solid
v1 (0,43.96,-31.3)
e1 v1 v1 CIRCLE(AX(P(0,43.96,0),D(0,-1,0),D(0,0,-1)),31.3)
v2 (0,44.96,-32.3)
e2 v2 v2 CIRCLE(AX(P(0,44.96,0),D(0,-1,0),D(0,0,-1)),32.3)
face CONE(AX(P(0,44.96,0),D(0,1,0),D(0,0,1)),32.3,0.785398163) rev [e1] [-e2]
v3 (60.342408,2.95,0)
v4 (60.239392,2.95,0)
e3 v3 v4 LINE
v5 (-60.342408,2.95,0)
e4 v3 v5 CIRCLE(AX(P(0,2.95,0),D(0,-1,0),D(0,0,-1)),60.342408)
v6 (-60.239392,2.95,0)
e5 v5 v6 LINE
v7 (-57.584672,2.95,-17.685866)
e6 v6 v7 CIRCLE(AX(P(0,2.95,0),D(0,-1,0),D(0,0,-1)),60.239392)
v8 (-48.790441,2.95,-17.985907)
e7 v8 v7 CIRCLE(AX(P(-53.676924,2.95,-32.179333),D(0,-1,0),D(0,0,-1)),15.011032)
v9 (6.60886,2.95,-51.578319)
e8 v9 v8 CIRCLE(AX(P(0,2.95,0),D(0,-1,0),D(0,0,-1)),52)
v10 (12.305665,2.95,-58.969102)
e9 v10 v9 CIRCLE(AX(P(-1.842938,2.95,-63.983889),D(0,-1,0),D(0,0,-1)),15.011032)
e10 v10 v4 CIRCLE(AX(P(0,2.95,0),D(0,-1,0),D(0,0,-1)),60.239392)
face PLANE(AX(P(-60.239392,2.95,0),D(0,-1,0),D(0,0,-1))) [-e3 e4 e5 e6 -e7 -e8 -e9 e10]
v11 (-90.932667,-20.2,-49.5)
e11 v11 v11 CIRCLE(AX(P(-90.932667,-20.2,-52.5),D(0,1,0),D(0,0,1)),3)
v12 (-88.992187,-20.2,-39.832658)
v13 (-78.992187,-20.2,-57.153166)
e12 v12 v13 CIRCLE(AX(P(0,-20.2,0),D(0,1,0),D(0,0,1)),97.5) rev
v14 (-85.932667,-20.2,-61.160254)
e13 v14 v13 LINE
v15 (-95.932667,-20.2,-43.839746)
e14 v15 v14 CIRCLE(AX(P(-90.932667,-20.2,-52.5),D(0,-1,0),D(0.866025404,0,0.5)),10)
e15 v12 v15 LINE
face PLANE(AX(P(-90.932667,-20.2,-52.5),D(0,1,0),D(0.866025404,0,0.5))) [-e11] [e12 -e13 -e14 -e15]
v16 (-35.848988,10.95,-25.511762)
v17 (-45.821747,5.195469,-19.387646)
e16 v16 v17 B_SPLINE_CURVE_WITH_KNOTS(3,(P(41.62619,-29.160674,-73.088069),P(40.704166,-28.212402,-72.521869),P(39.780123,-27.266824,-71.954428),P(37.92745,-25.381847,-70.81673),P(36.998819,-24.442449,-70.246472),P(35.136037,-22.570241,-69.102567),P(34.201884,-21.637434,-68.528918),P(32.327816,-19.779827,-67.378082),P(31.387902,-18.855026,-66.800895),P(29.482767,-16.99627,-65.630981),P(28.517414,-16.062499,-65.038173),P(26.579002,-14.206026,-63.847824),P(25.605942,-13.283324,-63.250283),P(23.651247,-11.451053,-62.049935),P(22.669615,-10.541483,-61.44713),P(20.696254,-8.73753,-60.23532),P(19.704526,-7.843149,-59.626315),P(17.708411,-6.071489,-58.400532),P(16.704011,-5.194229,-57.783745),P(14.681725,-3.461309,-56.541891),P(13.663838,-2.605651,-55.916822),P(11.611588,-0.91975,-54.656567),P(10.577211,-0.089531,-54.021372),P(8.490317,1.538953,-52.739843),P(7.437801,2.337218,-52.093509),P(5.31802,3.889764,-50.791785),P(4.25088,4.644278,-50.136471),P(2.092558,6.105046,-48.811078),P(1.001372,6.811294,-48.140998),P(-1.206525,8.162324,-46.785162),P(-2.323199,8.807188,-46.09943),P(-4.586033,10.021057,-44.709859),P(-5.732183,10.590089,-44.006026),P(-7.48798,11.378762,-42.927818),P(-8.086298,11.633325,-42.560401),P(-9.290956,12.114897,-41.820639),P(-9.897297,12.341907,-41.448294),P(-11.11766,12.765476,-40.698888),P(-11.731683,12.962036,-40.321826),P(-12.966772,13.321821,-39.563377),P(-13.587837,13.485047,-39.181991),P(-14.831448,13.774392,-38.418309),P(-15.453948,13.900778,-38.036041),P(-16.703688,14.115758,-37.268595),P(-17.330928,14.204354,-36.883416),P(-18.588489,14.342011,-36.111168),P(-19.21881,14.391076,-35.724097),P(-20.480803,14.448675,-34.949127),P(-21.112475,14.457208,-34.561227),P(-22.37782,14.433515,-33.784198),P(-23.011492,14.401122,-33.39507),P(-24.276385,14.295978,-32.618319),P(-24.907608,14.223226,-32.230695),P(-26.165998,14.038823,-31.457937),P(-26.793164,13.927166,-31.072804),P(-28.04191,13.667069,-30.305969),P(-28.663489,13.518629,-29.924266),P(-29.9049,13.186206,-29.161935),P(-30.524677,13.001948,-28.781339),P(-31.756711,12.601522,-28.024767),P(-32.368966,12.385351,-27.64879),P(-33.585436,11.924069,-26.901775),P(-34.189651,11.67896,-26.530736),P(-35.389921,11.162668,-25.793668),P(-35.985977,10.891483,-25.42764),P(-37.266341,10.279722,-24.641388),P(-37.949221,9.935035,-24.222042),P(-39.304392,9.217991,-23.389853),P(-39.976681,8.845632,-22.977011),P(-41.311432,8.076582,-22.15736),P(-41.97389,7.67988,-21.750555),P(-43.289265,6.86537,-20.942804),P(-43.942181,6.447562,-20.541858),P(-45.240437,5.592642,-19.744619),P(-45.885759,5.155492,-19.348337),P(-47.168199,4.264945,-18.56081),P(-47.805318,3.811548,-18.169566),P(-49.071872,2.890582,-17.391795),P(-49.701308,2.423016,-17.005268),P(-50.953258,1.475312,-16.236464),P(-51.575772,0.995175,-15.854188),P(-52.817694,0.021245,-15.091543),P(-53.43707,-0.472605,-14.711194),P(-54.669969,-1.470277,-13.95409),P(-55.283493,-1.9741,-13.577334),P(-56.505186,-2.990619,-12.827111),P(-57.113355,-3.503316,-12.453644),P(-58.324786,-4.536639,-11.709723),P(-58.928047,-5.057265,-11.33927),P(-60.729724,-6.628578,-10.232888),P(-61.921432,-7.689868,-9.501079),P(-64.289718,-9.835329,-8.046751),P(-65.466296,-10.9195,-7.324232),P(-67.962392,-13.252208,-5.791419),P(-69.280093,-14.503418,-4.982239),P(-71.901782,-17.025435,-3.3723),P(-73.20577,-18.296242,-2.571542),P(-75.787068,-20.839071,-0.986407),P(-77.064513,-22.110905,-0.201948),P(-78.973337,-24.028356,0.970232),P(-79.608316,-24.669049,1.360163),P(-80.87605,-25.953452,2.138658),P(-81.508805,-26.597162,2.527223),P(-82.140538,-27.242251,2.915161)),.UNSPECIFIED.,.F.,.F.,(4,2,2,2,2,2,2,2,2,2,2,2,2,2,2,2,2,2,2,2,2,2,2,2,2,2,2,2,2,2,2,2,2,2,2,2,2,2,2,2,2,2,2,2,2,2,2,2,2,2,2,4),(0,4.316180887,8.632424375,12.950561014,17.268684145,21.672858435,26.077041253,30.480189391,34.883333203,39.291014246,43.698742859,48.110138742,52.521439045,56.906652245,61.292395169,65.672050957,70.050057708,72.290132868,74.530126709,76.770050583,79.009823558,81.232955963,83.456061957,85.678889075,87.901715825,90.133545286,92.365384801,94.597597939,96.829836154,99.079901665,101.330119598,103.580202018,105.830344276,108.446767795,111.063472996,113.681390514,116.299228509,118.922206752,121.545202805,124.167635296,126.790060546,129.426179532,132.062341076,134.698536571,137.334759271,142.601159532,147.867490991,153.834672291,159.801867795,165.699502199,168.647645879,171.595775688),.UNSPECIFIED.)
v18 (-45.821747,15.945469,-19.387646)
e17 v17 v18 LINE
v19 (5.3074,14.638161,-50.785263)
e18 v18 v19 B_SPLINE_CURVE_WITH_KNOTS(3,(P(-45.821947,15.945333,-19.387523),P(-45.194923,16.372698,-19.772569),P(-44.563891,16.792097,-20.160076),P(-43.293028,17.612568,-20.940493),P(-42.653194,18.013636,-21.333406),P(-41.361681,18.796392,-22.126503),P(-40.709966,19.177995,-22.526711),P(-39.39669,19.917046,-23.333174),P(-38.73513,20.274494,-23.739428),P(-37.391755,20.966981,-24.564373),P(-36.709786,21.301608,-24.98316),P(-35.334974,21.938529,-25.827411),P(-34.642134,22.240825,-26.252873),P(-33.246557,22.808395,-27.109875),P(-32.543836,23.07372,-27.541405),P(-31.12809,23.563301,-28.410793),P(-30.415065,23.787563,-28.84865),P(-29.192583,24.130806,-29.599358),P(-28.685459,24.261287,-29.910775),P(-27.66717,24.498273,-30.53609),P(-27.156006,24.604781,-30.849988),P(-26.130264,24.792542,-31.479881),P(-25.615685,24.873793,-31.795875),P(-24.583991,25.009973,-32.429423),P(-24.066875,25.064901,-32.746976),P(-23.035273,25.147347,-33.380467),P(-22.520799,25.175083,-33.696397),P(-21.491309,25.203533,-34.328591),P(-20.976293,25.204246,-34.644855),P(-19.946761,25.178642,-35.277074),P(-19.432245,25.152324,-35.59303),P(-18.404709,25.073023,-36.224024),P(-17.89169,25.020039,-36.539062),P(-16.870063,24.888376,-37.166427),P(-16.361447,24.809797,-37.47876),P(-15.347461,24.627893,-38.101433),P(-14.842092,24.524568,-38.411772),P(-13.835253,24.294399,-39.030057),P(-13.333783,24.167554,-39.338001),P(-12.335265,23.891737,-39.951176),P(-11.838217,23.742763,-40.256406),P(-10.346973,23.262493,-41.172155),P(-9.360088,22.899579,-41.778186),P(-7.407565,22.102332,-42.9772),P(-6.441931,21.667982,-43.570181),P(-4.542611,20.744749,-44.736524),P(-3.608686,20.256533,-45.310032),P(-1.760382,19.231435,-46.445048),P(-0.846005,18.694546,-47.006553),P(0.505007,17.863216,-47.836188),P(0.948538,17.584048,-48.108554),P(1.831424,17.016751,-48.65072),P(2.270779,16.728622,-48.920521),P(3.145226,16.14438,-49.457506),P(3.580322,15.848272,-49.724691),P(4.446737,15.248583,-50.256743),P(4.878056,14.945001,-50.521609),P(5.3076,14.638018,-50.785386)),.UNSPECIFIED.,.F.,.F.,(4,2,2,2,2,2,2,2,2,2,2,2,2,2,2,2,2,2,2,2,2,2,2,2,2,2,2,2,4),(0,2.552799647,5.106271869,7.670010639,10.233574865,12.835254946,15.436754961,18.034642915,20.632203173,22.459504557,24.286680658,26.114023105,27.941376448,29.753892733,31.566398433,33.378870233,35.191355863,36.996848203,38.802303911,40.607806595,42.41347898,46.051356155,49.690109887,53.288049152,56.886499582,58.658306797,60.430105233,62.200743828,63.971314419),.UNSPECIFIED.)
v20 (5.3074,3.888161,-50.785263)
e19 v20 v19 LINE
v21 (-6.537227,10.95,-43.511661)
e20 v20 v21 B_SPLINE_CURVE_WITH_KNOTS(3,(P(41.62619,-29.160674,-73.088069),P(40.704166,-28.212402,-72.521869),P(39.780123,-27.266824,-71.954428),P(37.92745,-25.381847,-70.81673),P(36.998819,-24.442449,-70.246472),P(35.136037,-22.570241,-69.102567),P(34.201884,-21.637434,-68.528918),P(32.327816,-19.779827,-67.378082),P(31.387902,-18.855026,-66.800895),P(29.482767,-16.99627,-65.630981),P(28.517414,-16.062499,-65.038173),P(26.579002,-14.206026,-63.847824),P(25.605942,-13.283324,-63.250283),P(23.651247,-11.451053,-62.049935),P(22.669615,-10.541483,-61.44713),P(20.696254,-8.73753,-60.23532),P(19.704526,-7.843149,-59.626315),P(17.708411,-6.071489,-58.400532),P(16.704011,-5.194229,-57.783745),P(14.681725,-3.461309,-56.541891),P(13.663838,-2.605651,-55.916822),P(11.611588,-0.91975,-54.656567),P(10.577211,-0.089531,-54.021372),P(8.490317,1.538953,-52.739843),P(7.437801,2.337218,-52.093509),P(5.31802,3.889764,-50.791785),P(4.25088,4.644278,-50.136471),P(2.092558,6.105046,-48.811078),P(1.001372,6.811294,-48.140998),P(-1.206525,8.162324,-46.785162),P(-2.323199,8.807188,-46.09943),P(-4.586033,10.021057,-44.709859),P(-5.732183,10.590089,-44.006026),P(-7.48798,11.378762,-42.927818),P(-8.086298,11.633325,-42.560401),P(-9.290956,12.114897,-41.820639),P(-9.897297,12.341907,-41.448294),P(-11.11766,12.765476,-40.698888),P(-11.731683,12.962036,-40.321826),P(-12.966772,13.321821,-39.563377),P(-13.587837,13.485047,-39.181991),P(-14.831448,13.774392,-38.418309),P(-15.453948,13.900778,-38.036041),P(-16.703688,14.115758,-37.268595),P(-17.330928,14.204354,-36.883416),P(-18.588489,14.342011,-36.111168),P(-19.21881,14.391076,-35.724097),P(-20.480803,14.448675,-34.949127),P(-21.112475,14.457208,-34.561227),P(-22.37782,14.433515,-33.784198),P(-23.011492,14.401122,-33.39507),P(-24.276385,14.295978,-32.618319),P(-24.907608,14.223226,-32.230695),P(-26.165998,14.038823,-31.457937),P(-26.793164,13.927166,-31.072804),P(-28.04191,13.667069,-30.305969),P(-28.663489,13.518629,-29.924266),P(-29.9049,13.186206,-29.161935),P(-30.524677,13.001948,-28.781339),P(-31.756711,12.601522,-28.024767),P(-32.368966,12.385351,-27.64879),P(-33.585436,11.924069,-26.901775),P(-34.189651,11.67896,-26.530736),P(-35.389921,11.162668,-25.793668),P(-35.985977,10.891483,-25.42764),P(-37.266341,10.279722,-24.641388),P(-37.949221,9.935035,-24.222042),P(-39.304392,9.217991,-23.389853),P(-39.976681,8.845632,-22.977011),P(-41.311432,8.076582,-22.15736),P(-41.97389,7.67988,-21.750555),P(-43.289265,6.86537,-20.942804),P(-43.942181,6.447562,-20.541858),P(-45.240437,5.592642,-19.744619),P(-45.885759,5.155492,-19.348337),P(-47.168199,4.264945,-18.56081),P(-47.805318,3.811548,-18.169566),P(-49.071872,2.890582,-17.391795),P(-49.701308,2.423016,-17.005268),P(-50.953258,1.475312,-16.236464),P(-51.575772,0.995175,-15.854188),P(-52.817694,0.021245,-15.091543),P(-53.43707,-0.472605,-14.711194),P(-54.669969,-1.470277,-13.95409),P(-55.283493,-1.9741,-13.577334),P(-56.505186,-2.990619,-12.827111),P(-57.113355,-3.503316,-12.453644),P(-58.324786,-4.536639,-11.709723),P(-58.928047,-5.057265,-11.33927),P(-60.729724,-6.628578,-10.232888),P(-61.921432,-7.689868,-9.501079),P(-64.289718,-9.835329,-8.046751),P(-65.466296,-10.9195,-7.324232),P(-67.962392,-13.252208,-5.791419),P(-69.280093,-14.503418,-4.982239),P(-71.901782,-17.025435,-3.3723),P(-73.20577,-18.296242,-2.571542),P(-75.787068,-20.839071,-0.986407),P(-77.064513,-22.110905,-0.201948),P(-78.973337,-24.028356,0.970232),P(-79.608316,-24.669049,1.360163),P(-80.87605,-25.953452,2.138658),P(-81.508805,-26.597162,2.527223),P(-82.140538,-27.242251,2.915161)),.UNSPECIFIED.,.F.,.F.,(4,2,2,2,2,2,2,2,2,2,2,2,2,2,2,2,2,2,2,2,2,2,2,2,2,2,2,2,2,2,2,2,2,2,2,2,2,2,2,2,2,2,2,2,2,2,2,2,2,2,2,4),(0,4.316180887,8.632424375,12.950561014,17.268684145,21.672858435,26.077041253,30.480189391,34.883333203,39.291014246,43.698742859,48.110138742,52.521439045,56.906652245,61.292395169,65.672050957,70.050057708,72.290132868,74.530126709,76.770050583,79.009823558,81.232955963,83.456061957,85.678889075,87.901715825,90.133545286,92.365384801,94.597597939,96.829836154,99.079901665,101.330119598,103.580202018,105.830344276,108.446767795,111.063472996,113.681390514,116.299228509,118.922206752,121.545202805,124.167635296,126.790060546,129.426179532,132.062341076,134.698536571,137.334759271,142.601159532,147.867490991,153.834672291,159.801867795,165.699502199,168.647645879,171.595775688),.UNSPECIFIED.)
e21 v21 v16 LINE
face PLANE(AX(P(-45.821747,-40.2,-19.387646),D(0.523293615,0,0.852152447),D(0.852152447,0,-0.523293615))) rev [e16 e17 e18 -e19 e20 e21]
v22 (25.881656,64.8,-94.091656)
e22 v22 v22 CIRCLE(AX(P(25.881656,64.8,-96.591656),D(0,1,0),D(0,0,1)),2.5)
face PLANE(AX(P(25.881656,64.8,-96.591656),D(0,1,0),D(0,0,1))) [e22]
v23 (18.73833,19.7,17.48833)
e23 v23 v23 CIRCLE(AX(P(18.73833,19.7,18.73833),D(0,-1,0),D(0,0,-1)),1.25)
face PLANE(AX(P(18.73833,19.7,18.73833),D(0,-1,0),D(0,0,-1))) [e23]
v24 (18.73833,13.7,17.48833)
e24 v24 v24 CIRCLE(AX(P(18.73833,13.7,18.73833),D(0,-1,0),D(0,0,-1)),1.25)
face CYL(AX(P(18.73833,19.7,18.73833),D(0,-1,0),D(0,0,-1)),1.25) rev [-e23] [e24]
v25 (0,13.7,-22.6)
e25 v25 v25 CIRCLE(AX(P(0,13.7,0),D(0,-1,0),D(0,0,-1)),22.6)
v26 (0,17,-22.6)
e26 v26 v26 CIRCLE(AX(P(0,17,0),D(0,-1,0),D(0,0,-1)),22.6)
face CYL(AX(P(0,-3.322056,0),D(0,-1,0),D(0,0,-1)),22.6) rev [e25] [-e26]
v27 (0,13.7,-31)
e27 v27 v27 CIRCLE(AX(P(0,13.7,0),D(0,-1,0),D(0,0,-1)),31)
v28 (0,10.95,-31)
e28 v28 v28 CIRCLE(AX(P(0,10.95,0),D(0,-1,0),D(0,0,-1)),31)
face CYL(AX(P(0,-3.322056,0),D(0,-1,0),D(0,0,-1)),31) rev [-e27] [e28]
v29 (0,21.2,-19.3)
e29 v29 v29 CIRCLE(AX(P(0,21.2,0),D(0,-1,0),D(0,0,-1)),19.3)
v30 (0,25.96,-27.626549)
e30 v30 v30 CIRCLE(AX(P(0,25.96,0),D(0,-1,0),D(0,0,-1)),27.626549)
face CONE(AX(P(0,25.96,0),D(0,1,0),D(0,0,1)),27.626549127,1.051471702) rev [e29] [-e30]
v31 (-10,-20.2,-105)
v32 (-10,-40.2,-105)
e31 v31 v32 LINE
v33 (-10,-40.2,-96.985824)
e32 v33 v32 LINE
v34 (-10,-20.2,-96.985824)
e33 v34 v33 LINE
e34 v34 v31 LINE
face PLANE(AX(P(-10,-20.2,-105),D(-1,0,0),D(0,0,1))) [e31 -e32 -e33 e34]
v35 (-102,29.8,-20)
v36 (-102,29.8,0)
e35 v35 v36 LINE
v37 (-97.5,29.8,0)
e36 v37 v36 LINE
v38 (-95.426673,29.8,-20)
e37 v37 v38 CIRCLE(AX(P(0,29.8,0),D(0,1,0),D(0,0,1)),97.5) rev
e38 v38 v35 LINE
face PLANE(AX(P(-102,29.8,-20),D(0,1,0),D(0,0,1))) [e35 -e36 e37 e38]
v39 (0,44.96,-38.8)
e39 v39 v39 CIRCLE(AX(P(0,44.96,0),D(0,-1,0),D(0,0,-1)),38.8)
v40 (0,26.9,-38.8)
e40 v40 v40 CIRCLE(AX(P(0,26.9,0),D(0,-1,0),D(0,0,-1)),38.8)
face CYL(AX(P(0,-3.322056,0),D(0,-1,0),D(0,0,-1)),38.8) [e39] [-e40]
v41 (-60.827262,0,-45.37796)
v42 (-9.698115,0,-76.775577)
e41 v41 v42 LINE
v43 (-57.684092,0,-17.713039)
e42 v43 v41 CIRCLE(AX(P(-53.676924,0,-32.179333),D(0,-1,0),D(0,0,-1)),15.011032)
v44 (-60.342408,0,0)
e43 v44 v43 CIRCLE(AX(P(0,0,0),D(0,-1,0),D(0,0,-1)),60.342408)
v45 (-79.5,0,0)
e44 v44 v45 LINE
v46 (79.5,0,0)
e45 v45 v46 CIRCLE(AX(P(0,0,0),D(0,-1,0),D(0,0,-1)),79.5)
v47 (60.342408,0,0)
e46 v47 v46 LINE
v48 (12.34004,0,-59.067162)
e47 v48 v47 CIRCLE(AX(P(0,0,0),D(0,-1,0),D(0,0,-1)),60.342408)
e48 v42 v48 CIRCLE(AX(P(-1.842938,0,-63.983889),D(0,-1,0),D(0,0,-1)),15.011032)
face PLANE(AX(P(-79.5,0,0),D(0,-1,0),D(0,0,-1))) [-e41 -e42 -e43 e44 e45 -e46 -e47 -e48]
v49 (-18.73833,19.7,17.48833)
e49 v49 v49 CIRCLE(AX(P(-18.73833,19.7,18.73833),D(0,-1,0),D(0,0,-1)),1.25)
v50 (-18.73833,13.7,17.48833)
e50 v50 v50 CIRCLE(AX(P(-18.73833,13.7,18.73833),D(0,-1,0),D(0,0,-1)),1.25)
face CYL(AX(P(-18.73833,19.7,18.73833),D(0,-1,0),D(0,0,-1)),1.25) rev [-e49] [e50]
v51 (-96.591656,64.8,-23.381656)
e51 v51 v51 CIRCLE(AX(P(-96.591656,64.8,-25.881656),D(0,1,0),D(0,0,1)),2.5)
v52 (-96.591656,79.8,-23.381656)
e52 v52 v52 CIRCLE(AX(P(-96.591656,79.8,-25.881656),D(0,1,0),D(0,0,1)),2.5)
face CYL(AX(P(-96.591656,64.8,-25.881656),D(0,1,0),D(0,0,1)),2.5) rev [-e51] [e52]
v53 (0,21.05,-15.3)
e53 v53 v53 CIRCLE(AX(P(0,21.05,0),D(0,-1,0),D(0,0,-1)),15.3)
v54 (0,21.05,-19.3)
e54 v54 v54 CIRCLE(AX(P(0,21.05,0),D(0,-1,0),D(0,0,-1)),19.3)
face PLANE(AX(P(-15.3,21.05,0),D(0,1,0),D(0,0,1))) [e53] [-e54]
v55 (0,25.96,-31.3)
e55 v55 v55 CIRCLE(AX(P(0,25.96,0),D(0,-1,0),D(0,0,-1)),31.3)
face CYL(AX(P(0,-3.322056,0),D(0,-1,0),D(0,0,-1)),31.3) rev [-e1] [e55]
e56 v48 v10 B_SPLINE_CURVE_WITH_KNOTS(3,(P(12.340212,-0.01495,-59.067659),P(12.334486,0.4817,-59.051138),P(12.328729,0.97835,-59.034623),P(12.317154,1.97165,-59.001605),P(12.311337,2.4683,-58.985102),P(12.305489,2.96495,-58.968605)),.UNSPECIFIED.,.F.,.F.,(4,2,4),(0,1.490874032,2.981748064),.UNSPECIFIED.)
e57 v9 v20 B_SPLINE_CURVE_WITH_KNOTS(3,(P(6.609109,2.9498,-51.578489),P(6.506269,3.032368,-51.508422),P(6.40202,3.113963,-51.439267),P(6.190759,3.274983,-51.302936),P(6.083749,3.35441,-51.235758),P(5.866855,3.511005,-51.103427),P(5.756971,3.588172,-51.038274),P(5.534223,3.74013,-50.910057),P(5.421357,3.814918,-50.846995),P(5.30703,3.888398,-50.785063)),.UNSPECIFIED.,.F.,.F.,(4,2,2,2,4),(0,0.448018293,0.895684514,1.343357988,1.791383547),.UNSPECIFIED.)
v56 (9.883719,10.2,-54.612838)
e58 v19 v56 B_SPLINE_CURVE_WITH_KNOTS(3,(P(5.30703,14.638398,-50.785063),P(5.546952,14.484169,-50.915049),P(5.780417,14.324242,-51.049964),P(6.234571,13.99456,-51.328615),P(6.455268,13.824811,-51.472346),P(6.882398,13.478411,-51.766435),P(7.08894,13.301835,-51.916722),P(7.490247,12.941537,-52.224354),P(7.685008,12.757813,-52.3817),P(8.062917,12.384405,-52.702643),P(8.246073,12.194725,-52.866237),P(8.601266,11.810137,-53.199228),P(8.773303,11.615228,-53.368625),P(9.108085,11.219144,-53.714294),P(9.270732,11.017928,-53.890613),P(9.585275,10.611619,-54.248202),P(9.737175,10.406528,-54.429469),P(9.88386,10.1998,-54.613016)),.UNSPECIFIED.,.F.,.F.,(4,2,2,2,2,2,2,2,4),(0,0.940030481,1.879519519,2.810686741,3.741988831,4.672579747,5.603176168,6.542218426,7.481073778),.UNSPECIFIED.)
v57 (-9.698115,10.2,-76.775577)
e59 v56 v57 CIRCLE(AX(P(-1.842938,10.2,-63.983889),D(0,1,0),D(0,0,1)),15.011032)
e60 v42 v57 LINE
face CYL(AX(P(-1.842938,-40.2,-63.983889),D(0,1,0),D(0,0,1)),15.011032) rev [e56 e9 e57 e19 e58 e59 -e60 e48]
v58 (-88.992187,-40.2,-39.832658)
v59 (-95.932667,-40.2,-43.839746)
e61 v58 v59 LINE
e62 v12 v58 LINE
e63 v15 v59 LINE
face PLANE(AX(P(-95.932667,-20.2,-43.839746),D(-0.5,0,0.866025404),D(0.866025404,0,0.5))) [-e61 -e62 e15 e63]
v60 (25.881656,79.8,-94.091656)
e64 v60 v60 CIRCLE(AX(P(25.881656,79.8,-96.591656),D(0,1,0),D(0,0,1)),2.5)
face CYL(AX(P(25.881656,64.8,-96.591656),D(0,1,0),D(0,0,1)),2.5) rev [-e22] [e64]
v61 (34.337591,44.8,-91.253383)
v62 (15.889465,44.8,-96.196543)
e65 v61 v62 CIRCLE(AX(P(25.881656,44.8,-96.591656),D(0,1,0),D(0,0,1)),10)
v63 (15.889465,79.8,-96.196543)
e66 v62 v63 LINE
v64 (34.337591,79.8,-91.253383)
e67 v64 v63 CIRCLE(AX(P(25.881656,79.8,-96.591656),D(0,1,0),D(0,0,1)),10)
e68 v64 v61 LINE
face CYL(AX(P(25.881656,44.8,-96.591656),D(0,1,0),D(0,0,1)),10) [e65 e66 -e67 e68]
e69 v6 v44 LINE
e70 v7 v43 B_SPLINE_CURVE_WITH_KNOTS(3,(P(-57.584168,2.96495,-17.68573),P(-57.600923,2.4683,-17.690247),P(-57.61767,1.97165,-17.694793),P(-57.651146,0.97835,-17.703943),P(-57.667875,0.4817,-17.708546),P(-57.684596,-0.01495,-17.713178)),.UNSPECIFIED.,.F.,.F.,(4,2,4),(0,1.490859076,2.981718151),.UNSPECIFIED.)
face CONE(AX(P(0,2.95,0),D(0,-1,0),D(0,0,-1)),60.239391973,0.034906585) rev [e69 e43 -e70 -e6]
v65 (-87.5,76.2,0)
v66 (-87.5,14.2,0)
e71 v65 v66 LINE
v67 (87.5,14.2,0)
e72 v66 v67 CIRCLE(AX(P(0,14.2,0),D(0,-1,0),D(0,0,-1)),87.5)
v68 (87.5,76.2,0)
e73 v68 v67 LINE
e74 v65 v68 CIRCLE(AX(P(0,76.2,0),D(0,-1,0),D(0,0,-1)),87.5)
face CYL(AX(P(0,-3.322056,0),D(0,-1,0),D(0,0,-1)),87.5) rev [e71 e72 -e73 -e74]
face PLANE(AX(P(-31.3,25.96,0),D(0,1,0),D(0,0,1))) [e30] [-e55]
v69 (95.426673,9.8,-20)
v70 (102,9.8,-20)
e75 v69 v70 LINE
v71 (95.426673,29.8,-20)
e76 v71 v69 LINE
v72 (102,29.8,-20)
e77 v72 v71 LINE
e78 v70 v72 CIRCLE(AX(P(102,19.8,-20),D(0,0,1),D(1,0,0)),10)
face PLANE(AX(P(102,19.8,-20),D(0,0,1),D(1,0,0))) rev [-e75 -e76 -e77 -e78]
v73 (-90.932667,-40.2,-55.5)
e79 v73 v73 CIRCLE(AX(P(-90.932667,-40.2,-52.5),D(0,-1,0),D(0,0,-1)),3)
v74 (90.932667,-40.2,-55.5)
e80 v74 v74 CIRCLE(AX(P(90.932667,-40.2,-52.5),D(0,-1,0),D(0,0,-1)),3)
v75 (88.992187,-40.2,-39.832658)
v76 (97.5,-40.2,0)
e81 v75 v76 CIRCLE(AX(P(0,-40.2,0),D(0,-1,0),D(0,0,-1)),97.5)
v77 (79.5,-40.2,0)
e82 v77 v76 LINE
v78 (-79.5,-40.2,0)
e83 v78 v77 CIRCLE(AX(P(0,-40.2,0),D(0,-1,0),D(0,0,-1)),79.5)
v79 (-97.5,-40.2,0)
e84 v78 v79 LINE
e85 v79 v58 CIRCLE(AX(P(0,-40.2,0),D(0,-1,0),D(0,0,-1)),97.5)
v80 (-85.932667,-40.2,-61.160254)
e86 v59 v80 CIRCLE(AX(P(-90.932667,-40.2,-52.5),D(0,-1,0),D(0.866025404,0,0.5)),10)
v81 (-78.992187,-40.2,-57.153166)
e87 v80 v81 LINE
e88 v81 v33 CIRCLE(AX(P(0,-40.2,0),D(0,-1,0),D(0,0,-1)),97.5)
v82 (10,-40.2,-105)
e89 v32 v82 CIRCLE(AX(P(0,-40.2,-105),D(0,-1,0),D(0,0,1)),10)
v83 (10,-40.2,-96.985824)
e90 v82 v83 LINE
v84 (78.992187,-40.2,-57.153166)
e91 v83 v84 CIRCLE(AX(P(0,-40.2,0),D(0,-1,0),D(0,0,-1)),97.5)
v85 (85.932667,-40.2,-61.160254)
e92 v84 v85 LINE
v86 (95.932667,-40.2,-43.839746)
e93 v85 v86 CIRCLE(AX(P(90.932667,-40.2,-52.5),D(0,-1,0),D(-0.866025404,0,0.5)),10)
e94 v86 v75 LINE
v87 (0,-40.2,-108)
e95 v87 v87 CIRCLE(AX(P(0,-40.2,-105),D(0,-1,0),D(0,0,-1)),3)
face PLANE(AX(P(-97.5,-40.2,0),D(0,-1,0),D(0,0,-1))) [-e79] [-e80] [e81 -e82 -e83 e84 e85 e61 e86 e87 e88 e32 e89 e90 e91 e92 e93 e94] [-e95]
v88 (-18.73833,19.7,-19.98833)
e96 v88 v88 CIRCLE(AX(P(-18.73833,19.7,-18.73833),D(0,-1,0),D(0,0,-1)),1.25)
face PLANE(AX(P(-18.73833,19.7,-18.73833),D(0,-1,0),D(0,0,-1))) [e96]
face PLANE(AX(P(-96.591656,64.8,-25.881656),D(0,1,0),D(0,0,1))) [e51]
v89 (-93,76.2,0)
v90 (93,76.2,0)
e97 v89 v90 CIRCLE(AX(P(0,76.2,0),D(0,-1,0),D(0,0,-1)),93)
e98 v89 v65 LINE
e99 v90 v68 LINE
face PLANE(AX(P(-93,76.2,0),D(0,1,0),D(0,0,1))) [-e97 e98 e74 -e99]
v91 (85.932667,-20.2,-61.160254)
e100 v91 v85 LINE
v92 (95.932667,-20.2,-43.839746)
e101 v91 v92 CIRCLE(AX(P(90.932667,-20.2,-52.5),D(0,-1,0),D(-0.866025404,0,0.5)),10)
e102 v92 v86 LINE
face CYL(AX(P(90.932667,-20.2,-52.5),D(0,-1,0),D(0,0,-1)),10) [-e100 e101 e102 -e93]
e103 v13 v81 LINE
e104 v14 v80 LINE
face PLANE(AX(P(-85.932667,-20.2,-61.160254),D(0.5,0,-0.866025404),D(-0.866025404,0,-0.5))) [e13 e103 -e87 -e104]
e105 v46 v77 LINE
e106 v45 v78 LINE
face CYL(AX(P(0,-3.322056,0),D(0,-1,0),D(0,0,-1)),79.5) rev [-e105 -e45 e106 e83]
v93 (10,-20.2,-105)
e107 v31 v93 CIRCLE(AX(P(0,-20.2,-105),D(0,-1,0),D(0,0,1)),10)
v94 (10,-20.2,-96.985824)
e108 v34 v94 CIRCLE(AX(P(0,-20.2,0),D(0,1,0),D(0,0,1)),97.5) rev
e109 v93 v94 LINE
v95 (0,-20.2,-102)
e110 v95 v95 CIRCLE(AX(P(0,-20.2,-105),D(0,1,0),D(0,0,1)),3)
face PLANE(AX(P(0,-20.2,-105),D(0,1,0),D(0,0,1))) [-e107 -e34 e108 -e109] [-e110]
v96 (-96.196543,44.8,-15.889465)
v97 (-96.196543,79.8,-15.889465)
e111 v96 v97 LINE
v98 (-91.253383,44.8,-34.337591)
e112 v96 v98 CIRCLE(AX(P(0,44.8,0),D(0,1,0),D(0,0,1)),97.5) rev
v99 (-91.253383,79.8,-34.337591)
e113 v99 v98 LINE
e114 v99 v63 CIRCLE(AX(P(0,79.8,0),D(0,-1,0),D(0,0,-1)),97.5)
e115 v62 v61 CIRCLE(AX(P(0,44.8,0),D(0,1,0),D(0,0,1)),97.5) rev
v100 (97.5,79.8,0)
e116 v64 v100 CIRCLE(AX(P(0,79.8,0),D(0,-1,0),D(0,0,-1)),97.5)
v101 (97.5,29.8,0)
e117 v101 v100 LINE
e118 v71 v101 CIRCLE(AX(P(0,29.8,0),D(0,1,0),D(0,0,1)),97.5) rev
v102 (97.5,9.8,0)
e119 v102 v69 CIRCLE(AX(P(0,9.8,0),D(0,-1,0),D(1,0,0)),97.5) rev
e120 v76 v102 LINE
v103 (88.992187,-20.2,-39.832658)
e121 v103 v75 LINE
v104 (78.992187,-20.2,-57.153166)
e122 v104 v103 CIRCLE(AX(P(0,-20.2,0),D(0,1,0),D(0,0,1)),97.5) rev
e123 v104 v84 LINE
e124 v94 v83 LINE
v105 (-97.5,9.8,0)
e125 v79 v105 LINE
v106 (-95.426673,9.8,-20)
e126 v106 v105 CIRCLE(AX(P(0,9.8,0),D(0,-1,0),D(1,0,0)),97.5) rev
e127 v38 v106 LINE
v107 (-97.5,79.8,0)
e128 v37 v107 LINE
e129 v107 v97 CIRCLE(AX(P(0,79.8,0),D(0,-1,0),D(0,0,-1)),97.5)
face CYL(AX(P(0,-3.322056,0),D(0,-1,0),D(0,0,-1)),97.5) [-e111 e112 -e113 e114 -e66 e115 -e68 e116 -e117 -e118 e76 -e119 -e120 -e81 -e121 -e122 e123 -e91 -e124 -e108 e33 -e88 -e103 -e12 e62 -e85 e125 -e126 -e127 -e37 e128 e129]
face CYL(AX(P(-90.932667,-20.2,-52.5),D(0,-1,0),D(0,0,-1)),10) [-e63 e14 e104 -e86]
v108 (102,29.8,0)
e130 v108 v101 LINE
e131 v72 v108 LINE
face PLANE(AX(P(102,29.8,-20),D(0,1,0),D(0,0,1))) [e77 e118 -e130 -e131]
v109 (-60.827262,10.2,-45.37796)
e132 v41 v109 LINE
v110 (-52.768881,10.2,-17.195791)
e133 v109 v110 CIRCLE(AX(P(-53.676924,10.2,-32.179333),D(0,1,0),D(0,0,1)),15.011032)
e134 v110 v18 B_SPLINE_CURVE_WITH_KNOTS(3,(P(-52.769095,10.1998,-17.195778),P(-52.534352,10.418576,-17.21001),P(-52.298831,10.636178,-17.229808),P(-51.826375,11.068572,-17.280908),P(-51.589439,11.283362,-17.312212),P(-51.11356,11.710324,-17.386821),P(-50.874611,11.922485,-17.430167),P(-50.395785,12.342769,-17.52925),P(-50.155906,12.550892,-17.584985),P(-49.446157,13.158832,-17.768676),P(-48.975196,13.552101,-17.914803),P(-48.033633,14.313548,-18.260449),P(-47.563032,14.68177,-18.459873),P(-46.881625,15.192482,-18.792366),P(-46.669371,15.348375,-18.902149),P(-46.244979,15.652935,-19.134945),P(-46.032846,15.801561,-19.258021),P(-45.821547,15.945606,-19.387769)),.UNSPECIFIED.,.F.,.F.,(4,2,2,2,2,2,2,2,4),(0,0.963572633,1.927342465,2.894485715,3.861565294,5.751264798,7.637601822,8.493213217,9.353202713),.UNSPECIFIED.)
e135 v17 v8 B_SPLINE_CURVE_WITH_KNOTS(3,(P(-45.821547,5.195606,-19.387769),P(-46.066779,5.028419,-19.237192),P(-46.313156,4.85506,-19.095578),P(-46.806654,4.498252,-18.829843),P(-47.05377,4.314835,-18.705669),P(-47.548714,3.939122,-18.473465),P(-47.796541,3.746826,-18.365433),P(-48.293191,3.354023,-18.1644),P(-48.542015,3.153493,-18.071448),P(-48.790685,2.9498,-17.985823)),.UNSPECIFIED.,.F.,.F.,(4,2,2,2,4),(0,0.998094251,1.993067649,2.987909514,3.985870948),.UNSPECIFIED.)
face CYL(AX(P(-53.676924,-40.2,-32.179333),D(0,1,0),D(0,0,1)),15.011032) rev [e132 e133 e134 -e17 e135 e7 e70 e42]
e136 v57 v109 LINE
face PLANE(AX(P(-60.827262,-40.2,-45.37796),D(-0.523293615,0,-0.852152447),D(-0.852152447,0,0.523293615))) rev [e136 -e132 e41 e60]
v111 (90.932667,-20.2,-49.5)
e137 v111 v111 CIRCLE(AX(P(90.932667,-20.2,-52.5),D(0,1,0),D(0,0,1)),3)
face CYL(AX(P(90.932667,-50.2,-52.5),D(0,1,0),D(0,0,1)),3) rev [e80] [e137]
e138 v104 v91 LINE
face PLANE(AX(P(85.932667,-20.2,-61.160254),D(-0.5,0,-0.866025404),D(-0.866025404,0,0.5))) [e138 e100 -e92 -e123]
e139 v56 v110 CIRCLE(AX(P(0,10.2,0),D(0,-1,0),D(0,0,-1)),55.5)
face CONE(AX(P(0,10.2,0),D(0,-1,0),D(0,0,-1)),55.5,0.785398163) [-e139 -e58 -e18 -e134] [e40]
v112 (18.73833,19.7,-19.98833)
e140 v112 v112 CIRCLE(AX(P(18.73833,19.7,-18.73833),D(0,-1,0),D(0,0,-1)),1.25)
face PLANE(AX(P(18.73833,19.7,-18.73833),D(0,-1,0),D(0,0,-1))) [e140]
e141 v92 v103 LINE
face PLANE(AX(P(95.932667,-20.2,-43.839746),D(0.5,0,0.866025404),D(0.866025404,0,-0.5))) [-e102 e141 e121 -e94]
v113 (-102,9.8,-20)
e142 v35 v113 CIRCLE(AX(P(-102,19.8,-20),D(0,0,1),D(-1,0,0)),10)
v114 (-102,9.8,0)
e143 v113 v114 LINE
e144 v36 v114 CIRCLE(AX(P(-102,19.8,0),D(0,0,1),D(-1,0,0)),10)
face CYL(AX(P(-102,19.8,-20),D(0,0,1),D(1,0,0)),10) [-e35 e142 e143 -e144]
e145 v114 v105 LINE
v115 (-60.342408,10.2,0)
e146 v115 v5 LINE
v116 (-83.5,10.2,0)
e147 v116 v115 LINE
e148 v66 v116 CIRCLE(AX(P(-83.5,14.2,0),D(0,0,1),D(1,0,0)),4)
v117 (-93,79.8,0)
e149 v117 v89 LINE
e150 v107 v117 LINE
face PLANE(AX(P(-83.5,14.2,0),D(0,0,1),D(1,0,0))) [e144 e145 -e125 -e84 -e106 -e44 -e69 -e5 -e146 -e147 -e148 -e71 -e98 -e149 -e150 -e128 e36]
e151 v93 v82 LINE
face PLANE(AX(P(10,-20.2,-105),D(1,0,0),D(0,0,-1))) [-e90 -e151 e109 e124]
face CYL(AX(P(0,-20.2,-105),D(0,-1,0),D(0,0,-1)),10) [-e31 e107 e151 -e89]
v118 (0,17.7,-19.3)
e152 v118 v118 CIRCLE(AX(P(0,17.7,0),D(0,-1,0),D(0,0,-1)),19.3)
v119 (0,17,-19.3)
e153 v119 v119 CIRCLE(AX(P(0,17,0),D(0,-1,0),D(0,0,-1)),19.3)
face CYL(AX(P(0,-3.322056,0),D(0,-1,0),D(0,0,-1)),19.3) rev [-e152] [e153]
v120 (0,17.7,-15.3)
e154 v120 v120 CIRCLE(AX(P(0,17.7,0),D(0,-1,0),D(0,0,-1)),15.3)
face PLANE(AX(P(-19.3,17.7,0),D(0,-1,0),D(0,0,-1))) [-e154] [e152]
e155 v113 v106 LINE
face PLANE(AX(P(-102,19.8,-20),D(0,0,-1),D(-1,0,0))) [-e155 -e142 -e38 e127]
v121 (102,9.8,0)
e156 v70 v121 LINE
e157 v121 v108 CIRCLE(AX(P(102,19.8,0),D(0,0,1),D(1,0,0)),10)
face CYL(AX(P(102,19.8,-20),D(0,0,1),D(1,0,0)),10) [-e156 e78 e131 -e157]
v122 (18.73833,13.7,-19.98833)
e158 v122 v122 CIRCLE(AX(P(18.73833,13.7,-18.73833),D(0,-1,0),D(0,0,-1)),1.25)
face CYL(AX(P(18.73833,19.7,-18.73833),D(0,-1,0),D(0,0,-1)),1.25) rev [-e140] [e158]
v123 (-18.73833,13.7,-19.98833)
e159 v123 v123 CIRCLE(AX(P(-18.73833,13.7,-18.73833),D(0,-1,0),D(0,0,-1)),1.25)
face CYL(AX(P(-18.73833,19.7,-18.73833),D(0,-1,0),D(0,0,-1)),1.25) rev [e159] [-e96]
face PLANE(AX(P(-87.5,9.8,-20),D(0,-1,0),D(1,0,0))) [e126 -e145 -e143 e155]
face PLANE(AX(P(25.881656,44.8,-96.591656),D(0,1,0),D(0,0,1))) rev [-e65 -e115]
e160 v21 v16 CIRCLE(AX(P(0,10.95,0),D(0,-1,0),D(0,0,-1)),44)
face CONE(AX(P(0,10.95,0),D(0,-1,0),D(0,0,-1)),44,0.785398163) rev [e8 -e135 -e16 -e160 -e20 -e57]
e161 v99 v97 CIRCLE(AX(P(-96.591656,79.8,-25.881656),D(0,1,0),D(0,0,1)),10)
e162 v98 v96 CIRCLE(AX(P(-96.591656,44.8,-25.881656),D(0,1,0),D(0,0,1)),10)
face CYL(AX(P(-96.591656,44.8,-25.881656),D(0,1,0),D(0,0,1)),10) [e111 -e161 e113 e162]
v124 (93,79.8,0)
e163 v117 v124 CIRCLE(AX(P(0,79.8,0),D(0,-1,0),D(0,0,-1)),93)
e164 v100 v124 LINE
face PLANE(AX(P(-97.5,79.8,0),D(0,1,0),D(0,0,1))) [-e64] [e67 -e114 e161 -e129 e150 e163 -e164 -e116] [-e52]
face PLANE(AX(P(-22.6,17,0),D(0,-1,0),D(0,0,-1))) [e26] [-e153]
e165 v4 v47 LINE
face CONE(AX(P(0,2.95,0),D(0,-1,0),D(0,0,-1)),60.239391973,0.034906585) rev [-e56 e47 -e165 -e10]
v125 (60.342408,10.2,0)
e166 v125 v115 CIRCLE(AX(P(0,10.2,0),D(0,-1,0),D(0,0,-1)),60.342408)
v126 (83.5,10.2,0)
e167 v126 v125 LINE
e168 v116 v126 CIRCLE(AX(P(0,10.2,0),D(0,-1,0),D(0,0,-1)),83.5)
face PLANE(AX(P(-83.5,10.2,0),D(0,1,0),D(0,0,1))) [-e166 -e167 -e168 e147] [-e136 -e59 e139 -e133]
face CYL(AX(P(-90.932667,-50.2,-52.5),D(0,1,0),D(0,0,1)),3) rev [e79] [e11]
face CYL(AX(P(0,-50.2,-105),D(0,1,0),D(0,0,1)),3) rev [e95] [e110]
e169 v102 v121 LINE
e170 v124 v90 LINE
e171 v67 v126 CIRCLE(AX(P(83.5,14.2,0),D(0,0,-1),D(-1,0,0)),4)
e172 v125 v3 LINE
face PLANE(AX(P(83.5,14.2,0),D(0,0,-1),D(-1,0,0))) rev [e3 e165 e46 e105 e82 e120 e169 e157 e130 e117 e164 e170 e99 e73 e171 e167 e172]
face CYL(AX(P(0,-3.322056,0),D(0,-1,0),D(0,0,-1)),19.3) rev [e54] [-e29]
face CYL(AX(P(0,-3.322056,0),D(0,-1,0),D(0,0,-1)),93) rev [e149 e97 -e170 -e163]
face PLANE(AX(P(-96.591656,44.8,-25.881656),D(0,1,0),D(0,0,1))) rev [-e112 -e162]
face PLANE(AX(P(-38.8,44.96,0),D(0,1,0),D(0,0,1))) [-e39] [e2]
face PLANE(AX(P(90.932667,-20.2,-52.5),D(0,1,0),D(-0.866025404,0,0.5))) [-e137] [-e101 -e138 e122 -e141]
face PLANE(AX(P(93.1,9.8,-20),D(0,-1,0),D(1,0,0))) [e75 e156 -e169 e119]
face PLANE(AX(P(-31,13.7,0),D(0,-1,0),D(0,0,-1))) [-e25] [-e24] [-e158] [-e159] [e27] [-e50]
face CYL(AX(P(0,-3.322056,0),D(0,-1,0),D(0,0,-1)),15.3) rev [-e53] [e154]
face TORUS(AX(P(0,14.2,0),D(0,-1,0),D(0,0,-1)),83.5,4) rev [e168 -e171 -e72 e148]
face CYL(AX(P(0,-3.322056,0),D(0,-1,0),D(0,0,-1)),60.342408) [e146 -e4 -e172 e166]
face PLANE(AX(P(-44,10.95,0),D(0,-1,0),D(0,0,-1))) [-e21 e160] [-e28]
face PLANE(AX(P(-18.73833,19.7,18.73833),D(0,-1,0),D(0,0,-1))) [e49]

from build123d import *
from build123d.topology import SkipClean

# Parameters (mm, degrees)
REVOLU_O2_ANGLE                     = 180
ESBO_O4_R                           = 10
RESSALTO_EXTRUS_O1_DEPTH            = 35
RESSALTO_EXTRUS_O2_DEPTH            = 20
ESBO_O6_R                           = 2.5
CORTE_EXTRUS_O1_DEPTH               = 15
ESBO_O9_R                           = 1.25
CORTE_EXTRUS_O3_DEPTH               = 6
RESSALTO_EXTRUS_O6_DEPTH            = 20
RESSALTO_EXTRUS_O7_DEPTH            = 20
CORTE_EXTRUS_O6_START               = 10
ESBO_O16_R                          = 93
CORTE_EXTRUS_O6_DEPTH               = 10
PADR_OCIRCULAR1_COUNT               = 2
PADR_OCIRCULAR1_ANGLE               = 60
PADR_OCIRCULAR1_THE_OTHER_WAY_COUNT = 2
PADR_OCIRCULAR1_THE_OTHER_WAY_ANGLE = 60
ESBO_O46_R                          = 3
CORTE_EXTRUS_O14_DEPTH              = 30
CORTE_EXTRUS_O15_DEPTH              = 175.966168158
CORTE_EXTRUS_O15_DEPTH_BACK         = 175.966168158


with BuildPart() as part:
    # Esboço3 → Revolução2 (revolve)
    with BuildSketch(Plane.XY):
        with BuildLine():
            Line((97.5, 79.8), (97.5, 11.304491341))
            Line((97.5, 11.304491341), (97.5, 0))
            Line((97.5, 0), (97.5, -40.2))
            Line((97.5, -40.2), (79.5, -40.2))
            Line((79.5, -40.2), (79.5, 0))
            Line((79.5, 0), (60.342408243, 0))
            Line((60.342408243, 0), (60.239391973, 2.95))
            Line((60.239391973, 2.95), (52, 2.95))
            Line((52, 2.95), (44, 10.95))
            Line((44, 10.95), (31, 10.95))
            Line((31, 10.95), (31, 13.7))
            Line((31, 13.7), (22.6, 13.7))
            Line((22.6, 13.7), (22.6, 17))
            Line((22.6, 17), (19.3, 17))
            Line((19.3, 17), (19.3, 17.7))
            Line((19.3, 17.7), (15.3, 17.7))
            Line((15.3, 17.7), (15.3, 21.05))
            Line((15.3, 21.05), (19.3, 21.05))
            Line((19.3, 21.05), (19.3, 21.2))
            Line((19.3, 21.2), (27.626549127, 25.96))
            Line((27.626549127, 25.96), (31.3, 25.96))
            Line((31.3, 25.96), (31.3, 43.96))
            Line((31.3, 43.96), (32.3, 44.96))
            Line((32.3, 44.96), (38.8, 44.96))
            Line((38.8, 44.96), (38.8, 26.9))
            Line((38.8, 26.9), (55.5, 10.2))
            Line((55.5, 10.2), (83.5, 10.2))
            ThreePointArc((83.5, 10.2), (86.328427125, 11.371572875), (87.5, 14.2))
            Line((87.5, 14.2), (87.5, 76.2))
            Line((87.5, 76.2), (93, 76.2))
            Line((93, 76.2), (93, 79.8))
            Line((93, 79.8), (97.5, 79.8))
        make_face()
    revolve(axis=Axis((0, -3.322055656, 0), (0, 1, 0)), revolution_arc=REVOLU_O2_ANGLE)

    # Esboço20 → Revolução3 (revolve)
    with SkipClean():  # the faces are left unmerged after this step: merging them gives an invalid solid
        with BuildSketch(Plane.XY, mode=Mode.PRIVATE) as revolu_o3_sk:
            Polygon((60.342408243, 2.95), (60.342408243, 10.2), (55.5, 10.2), (38.8, 26.9), (38.8, 44.96), (32.3, 44.96), (31.3, 43.96), (31.3, 25.96), (27.626549127, 25.96), (19.3, 21.2), (19.3, 21.05), (15.3, 21.05), (15.3, 17.7), (19.3, 17.7), (19.3, 17), (22.6, 17), (22.6, 13.7), (31, 13.7), (31, 10.95), (44, 10.95), (52, 2.95), align=None)
        revolve(revolu_o3_sk.sketch.rotate(Axis((0, -3.322055656, 0), (0, 1, 0)), 90), axis=Axis((0, -3.322055656, 0), (0, 1, 0)))
    add(part.part.scale(1), mode=Mode.REPLACE)  # the faces are merged on a copy

    # Esboço4 → Ressalto-extrusão1 (add)
    with BuildSketch(Plane(origin=(0, 79.8, 0), x_dir=(1, 0, 0), z_dir=(0, 1, 0))):
        with Locations((25.881656302, 96.591656302)):
            Circle(ESBO_O4_R)
        with Locations((-96.591656302, 25.881656302)):
            Circle(ESBO_O4_R)
    extrude(amount=-RESSALTO_EXTRUS_O1_DEPTH)

    # Esboço5 → Ressalto-extrusão2 (add)
    with BuildSketch(Plane.XZ.offset(40.2)):
        with BuildLine():
            Line((10, -105), (10, -96.985823706))
            Line((10, -96.985823706), (-10, -96.985823706))
            Line((-10, -96.985823706), (-10, -105))
            ThreePointArc((-10, -105), (0, -115), (10, -105))
        make_face()
    ressalto_extrus_o2 = extrude(amount=-RESSALTO_EXTRUS_O2_DEPTH)

    # Esboço6 → Corte-extrusão1 (cut)
    with BuildSketch(Plane(origin=(0, 79.8, 0), x_dir=(1, 0, 0), z_dir=(0, 1, 0))):
        with Locations(Location((25.881656302, 96.591656302, 0), (0, 0, 270))):
            Circle(ESBO_O6_R)
        with Locations(Location((-96.591656302, 25.881656302, 0), (0, 0, 270))):
            Circle(ESBO_O6_R)
    extrude(amount=-CORTE_EXTRUS_O1_DEPTH, mode=Mode.SUBTRACT)

    # Esboço9 → Corte-extrusão3 (cut)
    with BuildSketch(Plane.XZ.offset(-13.7)):
        with Locations(Location((18.738329701, -18.738329701, 0), (0, 0, 270))):
            Circle(ESBO_O9_R)
        with Locations(Location((-18.738329701, -18.738329701, 0), (0, 0, 270))):
            Circle(ESBO_O9_R)
        with Locations(Location((-18.738329701, 18.738329701, 0), (0, 0, 270))):
            Circle(ESBO_O9_R)
        with Locations(Location((18.738329701, 18.738329701, 0), (0, 0, 270))):
            Circle(ESBO_O9_R)
    extrude(amount=-CORTE_EXTRUS_O3_DEPTH, mode=Mode.SUBTRACT)

    # Esboço12 → Ressalto-extrusão6 (add)
    with BuildSketch(Plane.XY):
        with BuildLine():
            Line((-102, 29.8), (-87.5, 29.8))
            Line((-87.5, 29.8), (-87.5, 9.8))
            Line((-87.5, 9.8), (-102, 9.8))
            ThreePointArc((-102, 9.8), (-112, 19.8), (-102, 29.8))
        make_face()
    extrude(amount=-RESSALTO_EXTRUS_O6_DEPTH)

    # Esboço13 → Ressalto-extrusão7 (add)
    with BuildSketch(Plane.XY):
        with BuildLine():
            Line((102, 29.8), (93.1, 29.8))
            Line((93.1, 29.8), (93.1, 9.8))
            Line((93.1, 9.8), (102, 9.8))
            ThreePointArc((102, 9.8), (112, 19.8), (102, 29.8))
        make_face()
    extrude(amount=-RESSALTO_EXTRUS_O7_DEPTH)

    # Esboço16 → Corte-extrusão6 (cut)
    with BuildSketch(Plane(origin=(0, 76.2, 0), x_dir=(1, 0, 0), z_dir=(0, 1, 0)).offset(CORTE_EXTRUS_O6_START)):
        Circle(ESBO_O16_R)
    extrude(amount=-CORTE_EXTRUS_O6_DEPTH, mode=Mode.SUBTRACT)

    # PadrãoCircular1: Ressalto-extrusão2 ×2 about axis
    padr_ocircular1_axis = Axis((0, 0, 0), (0, 1, 0))
    for i in range(1, PADR_OCIRCULAR1_COUNT):
        add(ressalto_extrus_o2.rotate(padr_ocircular1_axis, i * PADR_OCIRCULAR1_ANGLE / (PADR_OCIRCULAR1_COUNT - 1)))

    # PadrãoCircular1 the other way: Ressalto-extrusão2 ×2 about axis
    padr_ocircular1_the_other_way_axis = Axis((0, 0, 0), (0, -1, 0))
    for i in range(1, PADR_OCIRCULAR1_THE_OTHER_WAY_COUNT):
        add(ressalto_extrus_o2.rotate(padr_ocircular1_the_other_way_axis, i * PADR_OCIRCULAR1_THE_OTHER_WAY_ANGLE / (PADR_OCIRCULAR1_THE_OTHER_WAY_COUNT - 1)))

    # Esboço46 → Corte-extrusão14 (cut)
    with BuildSketch(Plane(origin=(0, -20.2, 0), x_dir=(1, 0, 0), z_dir=(0, 1, 0))):
        with Locations(Location((90.932667397, 52.5, 0), (0, 0, 270))):
            Circle(ESBO_O46_R)
        with Locations(Location((0, 105, 0), (0, 0, 270))):
            Circle(ESBO_O46_R)
        with Locations(Location((-90.932667397, 52.5, 0), (0, 0, 270))):
            Circle(ESBO_O46_R)
    extrude(amount=-CORTE_EXTRUS_O14_DEPTH, mode=Mode.SUBTRACT)

    # Esboço47 → Corte-extrusão15 (cut, two sides: drawn at the far end of the back side and taken through both)
    with SkipClean():  # the faces are left unmerged after this step: merging them gives an invalid solid
        with BuildSketch(Plane(origin=(0, 10.2, 0), x_dir=(1, 0, 0), z_dir=(0, 1, 0)).offset(-CORTE_EXTRUS_O15_DEPTH_BACK)):
            with BuildLine():
                Line((-60.827262138, 45.377960052), (-9.698115338, 76.775576961))
                ThreePointArc((-9.698115338, 76.775576961), (11.156996709, 71.489405367), (5.307399574, 50.785262738))
                Line((5.307399574, 50.785262738), (-45.821747226, 19.38764583))
                ThreePointArc((-45.821747226, 19.38764583), (-66.676859273, 24.673817424), (-60.827262138, 45.377960052))
            make_face()
        extrude(amount=CORTE_EXTRUS_O15_DEPTH + CORTE_EXTRUS_O15_DEPTH_BACK, mode=Mode.SUBTRACT)


solid = part.part
